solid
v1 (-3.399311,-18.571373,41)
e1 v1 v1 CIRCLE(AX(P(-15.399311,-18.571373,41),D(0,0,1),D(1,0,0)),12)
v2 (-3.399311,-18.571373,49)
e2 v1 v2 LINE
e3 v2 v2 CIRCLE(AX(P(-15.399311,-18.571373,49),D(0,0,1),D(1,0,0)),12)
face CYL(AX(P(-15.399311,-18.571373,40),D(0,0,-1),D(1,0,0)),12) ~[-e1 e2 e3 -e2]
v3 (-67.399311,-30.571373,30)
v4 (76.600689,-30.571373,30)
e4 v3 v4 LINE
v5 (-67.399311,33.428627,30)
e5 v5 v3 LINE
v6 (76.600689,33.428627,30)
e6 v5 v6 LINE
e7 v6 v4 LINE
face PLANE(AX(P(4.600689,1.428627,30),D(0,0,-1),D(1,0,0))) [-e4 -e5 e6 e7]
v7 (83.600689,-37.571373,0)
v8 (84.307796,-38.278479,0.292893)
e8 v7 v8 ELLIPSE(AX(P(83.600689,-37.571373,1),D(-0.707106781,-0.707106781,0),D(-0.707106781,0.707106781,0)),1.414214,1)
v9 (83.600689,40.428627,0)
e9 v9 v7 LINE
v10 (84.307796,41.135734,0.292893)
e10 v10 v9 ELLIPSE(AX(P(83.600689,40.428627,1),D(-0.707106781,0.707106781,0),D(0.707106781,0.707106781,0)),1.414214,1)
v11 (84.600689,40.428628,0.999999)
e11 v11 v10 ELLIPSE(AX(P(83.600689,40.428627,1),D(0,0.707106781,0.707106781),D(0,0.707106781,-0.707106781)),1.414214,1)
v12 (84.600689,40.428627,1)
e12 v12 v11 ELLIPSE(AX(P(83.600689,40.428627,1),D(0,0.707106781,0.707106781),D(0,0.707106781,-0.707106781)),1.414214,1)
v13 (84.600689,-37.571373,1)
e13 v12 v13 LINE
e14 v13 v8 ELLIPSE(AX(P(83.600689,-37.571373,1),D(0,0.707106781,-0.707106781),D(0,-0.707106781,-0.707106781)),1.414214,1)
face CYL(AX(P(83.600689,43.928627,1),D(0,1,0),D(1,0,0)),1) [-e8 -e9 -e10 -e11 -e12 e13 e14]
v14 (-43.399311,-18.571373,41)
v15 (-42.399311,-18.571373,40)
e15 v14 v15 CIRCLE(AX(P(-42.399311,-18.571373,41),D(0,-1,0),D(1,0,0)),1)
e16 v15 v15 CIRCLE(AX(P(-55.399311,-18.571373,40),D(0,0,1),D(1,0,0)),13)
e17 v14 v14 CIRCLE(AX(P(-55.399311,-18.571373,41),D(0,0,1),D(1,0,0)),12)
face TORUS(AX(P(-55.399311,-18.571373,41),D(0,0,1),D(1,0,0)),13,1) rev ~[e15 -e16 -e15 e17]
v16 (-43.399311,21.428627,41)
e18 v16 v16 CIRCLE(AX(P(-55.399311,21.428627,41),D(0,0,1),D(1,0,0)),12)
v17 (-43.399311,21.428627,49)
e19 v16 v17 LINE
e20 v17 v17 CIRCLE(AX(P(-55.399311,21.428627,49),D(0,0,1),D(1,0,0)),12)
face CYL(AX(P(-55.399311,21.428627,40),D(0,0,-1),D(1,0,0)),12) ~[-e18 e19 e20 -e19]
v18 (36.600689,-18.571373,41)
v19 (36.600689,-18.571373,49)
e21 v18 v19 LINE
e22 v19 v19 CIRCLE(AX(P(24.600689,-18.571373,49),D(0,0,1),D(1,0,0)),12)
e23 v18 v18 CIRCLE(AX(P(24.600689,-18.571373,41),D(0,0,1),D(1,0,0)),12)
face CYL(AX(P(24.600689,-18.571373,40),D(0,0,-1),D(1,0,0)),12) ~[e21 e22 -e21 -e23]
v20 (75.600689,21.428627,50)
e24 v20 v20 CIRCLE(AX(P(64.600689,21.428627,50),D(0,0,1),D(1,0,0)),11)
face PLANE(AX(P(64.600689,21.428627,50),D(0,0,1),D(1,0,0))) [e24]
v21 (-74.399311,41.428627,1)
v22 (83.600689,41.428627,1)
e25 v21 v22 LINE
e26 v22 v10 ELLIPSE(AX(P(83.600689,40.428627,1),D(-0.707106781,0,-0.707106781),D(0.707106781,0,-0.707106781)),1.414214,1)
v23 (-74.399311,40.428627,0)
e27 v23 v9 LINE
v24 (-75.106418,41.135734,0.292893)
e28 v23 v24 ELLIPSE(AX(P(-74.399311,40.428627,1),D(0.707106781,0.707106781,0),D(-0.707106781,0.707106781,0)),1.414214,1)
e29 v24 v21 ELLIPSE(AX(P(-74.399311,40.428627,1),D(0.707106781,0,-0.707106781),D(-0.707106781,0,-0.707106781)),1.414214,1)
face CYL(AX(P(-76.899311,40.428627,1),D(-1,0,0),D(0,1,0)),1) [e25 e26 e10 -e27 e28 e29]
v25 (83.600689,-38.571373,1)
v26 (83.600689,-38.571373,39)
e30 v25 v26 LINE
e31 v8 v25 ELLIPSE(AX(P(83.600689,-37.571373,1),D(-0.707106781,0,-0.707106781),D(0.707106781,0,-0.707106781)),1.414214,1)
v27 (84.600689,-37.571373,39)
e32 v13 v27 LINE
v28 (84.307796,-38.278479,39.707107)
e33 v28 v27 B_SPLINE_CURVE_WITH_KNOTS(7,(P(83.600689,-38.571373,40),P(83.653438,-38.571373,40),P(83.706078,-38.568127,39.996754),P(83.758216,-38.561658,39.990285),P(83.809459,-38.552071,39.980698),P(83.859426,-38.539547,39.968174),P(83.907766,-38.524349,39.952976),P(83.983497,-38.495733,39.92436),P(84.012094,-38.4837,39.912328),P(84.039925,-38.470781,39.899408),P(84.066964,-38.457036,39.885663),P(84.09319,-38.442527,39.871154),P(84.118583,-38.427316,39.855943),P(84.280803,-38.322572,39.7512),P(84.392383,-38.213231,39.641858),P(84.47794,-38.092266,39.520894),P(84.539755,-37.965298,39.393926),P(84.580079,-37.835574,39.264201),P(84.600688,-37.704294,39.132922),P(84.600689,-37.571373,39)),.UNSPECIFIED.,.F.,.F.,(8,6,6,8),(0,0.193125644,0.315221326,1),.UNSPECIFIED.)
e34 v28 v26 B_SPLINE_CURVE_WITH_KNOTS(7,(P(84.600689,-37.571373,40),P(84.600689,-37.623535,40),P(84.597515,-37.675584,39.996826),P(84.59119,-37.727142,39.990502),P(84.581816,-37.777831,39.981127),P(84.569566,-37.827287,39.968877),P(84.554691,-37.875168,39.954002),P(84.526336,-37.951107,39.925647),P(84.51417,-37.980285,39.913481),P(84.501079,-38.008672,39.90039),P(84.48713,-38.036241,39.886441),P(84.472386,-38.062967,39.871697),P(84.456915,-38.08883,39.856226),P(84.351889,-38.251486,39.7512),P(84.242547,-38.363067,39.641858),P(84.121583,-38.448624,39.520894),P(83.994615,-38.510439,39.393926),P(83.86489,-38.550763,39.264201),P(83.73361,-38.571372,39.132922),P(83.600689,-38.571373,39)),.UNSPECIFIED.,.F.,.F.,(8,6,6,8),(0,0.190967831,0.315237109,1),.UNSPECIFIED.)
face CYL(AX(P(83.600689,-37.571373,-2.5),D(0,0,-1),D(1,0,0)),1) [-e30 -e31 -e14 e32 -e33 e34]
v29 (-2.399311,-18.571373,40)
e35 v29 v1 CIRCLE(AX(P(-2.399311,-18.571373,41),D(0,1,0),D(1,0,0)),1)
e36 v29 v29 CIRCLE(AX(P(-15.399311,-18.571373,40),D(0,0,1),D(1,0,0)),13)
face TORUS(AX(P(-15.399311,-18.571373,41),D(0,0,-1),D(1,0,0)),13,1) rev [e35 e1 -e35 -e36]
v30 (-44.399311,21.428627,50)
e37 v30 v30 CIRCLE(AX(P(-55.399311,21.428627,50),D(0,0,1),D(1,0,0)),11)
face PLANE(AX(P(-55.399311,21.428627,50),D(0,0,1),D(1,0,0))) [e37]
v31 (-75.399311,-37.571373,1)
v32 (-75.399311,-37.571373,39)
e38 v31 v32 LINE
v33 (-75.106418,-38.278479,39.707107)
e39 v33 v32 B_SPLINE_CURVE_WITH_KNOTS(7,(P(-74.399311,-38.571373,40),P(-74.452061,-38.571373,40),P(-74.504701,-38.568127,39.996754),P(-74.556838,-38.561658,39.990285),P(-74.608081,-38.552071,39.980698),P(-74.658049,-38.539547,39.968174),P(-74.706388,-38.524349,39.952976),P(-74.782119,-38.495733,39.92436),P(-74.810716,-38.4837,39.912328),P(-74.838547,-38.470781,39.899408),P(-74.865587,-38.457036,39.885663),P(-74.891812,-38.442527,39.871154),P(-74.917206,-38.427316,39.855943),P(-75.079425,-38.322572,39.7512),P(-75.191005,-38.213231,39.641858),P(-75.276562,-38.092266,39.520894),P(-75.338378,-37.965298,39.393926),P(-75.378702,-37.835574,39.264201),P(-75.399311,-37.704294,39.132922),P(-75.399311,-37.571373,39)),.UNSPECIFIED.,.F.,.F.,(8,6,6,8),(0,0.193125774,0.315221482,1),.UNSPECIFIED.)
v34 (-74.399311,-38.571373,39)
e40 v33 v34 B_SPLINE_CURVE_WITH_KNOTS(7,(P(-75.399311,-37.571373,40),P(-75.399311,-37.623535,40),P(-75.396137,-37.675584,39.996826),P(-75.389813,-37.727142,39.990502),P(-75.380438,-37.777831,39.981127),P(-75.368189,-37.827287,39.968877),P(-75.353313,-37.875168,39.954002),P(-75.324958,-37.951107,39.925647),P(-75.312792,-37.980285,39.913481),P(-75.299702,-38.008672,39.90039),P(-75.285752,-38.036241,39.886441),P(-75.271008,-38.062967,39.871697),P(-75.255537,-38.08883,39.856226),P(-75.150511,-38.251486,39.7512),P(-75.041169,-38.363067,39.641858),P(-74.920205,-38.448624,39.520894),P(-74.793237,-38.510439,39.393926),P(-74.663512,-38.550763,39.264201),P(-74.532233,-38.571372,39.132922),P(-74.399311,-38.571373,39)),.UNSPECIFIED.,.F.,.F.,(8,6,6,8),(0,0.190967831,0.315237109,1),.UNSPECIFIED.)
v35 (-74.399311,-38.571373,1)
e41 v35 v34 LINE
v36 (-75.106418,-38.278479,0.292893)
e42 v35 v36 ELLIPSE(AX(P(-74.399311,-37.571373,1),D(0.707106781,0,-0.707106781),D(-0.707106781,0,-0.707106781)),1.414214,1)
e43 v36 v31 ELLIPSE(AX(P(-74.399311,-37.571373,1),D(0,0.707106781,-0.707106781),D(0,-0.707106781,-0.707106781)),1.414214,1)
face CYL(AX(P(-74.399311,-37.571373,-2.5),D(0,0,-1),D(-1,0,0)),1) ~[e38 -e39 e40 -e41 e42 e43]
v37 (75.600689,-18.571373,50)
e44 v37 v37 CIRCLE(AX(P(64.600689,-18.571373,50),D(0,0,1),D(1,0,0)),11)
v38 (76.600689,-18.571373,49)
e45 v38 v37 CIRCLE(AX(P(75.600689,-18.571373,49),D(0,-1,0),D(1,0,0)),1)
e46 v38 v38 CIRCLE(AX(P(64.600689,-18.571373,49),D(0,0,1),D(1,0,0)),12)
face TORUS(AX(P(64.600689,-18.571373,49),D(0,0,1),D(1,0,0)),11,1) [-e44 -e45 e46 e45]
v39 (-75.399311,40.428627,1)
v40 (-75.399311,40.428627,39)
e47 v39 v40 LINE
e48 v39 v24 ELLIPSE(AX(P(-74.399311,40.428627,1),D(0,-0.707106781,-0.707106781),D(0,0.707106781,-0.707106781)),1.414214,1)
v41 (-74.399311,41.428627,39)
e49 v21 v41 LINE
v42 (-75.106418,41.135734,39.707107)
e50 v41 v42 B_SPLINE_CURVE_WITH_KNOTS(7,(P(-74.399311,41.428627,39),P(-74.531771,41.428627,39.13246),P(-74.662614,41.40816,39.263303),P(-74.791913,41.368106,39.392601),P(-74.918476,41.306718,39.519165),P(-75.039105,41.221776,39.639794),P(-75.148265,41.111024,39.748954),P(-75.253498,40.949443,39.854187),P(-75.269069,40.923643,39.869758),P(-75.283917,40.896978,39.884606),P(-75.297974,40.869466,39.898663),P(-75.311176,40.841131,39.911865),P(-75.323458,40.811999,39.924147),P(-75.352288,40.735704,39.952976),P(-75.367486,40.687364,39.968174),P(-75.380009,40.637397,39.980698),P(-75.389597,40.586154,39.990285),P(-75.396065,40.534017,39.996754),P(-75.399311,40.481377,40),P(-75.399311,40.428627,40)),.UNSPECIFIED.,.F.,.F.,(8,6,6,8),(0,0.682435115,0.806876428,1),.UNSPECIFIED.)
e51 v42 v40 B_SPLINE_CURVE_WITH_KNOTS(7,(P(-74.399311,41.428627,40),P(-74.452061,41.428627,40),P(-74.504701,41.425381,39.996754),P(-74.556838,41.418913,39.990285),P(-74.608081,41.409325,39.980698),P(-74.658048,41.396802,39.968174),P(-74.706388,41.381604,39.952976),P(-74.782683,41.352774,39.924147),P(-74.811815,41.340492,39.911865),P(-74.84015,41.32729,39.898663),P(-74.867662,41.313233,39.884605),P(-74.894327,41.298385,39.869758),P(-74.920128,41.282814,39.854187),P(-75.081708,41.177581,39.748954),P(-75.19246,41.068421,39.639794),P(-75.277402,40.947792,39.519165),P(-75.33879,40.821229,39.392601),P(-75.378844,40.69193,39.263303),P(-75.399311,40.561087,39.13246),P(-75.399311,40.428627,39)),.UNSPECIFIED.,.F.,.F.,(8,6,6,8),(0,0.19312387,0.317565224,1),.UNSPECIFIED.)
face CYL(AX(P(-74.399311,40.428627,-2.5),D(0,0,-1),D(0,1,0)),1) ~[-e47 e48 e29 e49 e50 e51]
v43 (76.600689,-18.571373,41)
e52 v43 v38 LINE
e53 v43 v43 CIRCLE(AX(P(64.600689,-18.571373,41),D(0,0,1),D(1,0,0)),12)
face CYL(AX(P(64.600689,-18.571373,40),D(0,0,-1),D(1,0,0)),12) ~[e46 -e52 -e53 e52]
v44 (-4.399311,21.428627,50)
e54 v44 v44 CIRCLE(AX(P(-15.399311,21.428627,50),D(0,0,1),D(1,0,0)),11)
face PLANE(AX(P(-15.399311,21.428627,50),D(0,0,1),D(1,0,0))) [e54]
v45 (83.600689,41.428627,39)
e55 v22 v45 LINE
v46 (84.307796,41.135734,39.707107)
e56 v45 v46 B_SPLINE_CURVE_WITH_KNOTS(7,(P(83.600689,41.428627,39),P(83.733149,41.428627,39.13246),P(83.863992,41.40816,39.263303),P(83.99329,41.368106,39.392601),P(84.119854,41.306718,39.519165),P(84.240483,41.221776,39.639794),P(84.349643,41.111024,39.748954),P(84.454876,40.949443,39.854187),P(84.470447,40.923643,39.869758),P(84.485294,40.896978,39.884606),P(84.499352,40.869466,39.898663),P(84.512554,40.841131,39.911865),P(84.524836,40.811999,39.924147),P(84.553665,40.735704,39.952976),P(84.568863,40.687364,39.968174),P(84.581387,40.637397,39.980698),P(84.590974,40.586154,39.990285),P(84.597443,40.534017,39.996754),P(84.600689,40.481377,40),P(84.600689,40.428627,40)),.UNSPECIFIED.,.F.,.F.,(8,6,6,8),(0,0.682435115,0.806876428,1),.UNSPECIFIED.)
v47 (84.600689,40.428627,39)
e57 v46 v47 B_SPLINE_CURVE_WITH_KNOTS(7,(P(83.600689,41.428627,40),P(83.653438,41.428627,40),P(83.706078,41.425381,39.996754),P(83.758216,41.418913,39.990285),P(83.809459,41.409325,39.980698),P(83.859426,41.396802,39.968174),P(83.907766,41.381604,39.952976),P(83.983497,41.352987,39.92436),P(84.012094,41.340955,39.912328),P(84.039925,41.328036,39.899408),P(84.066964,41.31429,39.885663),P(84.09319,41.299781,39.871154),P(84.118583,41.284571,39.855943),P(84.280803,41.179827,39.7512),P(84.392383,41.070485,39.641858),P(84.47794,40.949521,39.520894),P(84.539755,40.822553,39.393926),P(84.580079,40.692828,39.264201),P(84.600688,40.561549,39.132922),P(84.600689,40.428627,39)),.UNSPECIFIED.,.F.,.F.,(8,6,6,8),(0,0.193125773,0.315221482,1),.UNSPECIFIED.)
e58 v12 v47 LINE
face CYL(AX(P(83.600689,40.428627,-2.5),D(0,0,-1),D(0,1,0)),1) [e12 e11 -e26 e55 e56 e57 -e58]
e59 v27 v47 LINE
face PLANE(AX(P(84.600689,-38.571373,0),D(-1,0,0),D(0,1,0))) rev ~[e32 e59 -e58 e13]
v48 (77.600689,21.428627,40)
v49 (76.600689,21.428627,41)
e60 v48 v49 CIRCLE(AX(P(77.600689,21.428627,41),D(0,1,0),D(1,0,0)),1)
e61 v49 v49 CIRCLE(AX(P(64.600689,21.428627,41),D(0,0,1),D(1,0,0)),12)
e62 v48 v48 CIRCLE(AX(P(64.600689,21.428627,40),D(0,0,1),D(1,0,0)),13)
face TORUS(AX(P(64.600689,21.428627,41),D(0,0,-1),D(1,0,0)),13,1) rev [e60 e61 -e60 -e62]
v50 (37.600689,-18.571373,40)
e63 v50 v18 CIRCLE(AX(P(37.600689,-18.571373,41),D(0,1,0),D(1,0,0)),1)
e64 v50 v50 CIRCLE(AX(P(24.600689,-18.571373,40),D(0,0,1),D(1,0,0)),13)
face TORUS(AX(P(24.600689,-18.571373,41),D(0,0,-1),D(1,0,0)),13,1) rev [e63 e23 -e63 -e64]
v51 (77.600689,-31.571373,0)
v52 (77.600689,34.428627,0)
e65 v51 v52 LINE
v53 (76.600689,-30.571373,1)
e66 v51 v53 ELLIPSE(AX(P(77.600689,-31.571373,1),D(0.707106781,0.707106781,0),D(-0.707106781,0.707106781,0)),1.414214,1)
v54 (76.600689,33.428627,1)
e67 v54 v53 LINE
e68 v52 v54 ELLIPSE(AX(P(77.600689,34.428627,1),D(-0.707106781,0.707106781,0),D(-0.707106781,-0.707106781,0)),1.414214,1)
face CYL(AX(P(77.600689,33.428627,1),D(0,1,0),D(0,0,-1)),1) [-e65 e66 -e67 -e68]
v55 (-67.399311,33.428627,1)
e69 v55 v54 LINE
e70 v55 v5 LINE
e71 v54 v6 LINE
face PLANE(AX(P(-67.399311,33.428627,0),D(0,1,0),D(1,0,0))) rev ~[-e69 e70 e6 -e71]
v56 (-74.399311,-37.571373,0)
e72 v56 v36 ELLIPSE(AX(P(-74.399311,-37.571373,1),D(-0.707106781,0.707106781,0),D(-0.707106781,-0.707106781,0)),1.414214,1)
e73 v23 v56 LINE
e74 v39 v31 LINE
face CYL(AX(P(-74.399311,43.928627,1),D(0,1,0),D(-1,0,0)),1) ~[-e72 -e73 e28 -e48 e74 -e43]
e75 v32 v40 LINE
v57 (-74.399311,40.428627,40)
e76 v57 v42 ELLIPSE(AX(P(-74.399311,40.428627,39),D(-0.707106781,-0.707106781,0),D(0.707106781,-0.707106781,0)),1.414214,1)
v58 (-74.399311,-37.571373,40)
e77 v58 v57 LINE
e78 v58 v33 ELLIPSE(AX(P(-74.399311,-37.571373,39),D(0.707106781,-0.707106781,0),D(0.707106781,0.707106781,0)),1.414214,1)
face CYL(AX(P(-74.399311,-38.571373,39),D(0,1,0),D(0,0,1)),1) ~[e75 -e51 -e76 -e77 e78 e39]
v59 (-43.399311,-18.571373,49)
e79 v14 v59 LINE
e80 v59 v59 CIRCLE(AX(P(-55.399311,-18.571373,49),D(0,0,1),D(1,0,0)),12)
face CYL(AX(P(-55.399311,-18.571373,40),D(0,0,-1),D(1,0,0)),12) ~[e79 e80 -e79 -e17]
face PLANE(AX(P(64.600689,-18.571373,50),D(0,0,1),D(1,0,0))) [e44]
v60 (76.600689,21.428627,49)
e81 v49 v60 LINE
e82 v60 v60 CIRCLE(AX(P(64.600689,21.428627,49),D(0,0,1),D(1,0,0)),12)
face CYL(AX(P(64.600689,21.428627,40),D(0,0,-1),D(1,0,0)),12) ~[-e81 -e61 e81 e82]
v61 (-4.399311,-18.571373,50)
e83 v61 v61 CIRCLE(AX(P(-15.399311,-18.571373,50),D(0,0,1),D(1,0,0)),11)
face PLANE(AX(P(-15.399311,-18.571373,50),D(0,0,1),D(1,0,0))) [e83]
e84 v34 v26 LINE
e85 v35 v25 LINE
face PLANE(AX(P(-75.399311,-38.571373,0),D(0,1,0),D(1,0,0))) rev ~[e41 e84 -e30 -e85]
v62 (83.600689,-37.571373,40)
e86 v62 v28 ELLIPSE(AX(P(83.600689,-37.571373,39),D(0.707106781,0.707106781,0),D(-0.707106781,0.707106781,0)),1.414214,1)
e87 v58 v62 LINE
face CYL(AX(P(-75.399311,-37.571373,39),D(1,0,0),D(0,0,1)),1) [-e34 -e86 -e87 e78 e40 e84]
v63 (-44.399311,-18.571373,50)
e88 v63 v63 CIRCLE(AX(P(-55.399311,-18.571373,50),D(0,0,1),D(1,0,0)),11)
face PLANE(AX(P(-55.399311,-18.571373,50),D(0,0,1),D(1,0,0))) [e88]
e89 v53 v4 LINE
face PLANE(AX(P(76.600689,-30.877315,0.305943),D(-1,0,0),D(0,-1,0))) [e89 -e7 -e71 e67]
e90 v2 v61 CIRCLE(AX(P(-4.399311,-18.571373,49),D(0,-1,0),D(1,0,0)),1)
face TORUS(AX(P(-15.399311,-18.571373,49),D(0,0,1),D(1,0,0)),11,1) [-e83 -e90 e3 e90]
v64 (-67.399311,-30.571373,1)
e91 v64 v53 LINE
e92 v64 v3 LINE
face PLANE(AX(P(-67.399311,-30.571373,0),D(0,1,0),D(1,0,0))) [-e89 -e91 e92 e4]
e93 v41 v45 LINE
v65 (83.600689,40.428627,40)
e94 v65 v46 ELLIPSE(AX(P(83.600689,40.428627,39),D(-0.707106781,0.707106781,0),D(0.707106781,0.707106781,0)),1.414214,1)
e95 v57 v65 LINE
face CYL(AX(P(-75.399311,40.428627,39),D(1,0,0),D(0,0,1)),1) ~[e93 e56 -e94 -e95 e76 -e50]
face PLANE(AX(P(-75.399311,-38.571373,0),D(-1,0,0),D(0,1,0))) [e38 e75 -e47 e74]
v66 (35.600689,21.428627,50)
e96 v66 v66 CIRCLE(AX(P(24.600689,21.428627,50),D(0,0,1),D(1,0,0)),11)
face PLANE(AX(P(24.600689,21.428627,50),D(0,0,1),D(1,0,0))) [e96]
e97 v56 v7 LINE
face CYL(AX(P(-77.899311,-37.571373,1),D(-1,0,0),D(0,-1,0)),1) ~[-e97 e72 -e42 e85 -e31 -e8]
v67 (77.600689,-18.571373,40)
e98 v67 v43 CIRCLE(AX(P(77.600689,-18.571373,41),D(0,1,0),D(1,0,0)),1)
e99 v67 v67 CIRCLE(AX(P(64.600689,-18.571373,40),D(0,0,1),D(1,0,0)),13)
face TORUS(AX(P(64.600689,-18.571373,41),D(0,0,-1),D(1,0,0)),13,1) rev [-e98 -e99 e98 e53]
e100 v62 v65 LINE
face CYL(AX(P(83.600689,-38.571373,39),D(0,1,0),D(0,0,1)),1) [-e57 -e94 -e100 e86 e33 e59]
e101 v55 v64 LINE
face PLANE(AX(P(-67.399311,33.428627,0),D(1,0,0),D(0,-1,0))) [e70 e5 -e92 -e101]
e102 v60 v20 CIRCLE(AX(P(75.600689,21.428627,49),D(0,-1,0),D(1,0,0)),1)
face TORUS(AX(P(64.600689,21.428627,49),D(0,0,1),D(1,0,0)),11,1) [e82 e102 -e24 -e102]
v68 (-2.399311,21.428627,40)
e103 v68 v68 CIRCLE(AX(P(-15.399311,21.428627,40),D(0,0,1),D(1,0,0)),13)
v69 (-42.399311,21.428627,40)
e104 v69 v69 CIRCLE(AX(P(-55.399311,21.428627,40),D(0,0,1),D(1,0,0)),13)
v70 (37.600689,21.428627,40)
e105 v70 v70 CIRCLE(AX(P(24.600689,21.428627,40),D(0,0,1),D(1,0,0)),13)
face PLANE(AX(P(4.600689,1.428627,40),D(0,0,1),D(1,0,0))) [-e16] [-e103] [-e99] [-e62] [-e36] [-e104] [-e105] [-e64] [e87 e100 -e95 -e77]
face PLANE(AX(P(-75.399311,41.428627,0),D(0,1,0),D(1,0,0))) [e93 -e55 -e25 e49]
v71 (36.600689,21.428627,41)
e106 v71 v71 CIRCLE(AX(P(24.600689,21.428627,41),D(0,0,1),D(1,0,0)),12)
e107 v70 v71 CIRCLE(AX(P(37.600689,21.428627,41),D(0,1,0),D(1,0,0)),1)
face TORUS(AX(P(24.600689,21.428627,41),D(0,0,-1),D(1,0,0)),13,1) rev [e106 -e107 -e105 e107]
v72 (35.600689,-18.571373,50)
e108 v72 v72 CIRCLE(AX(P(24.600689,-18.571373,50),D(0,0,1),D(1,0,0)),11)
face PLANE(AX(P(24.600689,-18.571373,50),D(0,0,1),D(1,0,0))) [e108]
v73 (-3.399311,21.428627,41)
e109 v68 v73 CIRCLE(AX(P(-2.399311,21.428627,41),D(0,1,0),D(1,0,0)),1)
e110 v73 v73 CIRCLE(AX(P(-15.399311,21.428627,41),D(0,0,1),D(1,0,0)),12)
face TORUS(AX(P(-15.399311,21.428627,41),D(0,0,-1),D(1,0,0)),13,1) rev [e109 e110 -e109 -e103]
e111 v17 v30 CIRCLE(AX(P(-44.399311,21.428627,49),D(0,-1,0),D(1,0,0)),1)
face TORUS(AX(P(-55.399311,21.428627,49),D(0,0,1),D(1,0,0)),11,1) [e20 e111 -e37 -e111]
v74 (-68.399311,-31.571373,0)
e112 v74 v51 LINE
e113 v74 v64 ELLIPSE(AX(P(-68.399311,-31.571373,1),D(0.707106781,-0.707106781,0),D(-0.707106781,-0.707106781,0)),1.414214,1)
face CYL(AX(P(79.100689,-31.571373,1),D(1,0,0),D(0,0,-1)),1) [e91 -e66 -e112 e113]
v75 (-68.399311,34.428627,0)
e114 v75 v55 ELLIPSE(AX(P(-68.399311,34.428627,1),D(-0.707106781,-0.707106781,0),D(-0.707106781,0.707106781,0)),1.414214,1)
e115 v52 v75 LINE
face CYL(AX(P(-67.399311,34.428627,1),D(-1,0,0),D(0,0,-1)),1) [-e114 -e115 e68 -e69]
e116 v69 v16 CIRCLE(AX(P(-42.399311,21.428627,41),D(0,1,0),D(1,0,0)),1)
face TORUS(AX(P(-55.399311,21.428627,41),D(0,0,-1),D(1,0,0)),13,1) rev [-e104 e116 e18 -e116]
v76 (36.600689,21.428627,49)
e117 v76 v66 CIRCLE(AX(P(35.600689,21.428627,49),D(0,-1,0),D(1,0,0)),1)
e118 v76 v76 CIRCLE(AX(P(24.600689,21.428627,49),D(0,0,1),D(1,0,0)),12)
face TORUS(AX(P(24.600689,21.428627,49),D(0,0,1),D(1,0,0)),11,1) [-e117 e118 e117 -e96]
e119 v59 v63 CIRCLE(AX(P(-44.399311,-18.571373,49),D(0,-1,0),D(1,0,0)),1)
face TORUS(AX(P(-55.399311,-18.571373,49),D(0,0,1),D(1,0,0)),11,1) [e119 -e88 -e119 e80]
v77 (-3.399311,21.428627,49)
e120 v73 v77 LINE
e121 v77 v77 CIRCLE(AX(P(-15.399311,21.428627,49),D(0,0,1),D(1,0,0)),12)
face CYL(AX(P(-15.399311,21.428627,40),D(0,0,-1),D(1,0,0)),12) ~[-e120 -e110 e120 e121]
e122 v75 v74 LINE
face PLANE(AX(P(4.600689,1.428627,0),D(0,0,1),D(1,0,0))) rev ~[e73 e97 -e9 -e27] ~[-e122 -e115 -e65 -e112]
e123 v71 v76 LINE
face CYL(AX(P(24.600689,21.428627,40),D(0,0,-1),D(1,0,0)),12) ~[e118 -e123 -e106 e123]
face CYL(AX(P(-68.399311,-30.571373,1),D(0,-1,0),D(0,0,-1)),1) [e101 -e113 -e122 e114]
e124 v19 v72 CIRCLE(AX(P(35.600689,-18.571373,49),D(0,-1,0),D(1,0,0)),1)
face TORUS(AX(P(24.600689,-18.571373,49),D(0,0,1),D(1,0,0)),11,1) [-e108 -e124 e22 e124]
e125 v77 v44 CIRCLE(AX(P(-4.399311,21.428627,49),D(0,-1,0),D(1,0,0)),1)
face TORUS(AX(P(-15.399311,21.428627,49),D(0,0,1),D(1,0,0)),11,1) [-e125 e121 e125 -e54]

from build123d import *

# Parameters (mm, degrees)
F0_W          = 160
F0_H          = 80
F1_DEPTH      = 40
F2_W          = 144
F2_H          = 64
F3_DEPTH      = 30
F4_R          = 12
F5_DEPTH      = 10
F6_R          = 1
F7_R          = 1
F8_T1_DEPTH   = 44
F8_T3_DEPTH   = 165
F9_T1_DEPTH   = 44
F9_T3_DEPTH   = 84
F10_T1_DEPTH  = 84
F10_T3_DEPTH  = 44
F11_T1_DEPTH  = 163
F11_T3_DEPTH  = 144
F11_T5_DEPTH  = 64
F11_T11_DEPTH = 146.5
F11_T15_DEPTH = 66.5
F11_T22_DEPTH = 146.5
F11_T26_DEPTH = 66.5
F11_T33_DEPTH = 66.5
F11_T37_DEPTH = 146.5
F11_T44_DEPTH = 66.5
F11_T48_DEPTH = 146.5


# Not quite as in the source:
# - a fillet or chamfer that OpenCascade refuses, or shapes differently, is made with other operations: its cross-section is extruded or revolved along the edge and cut away or added


with BuildPart() as f1:
    # F0 (on Top) → F1 (new body)
    with BuildSketch(Plane.XY):
        with Locations((4.6006888151, 1.4286273053)):
            Rectangle(F0_W, F0_H)
    extrude(amount=F1_DEPTH)

    # F2 (on face) → F3 (cut)
    with BuildSketch(Plane(origin=(0, 0, 0), x_dir=(1, 0, 0), z_dir=(0, 0, -1))):
        with Locations((4.6006888151, -1.4286273053)):
            Rectangle(F2_W, F2_H)
    extrude(amount=-F3_DEPTH, mode=Mode.SUBTRACT)

    # F4 (on face) → F5 (join)
    with BuildSketch(Plane.XY.offset(40)):
        with Locations((-55.3993111849, 21.4286273053)):
            Circle(F4_R)
        with Locations((-15.3993111849, 21.4286273053)):
            Circle(F4_R)
        with Locations((24.6006888151, 21.4286273053)):
            Circle(F4_R)
        with Locations((64.6006888151, 21.4286273053)):
            Circle(F4_R)
        with Locations((-55.3993111849, -18.5713726947)):
            Circle(F4_R)
        with Locations((-15.3993111849, -18.5713726947)):
            Circle(F4_R)
        with Locations((24.6006888151, -18.5713726947)):
            Circle(F4_R)
        with Locations((64.6006888151, -18.5713726947)):
            Circle(F4_R)
    extrude(amount=F5_DEPTH)

    # F6
    f6_edges = [f1.edges().sort_by_distance(p)[0] for p in [
        (-67.399311, 21.428627, 50),
        (-27.399311, 21.428627, 50),
        (-67.399311, -18.571373, 50),
        (-27.399311, -18.571373, 50),
        (12.600689, 21.428627, 50),
        (52.600689, 21.428627, 50),
        (52.600689, -18.571373, 50),
        (12.600689, -18.571373, 50),
    ]]
    fillet(f6_edges, radius=F6_R)

    # F7
    f7_edges = [f1.edges().sort_by_distance(p)[0] for p in [
        (4.600689, 41.428627, 40),
        (84.600689, 1.428627, 40),
        (-75.399311, 1.428627, 40),
        (4.600689, -38.571373, 40),
        (-67.399311, -18.571373, 40),
        (-27.399311, -18.571373, 40),
        (12.600689, -18.571373, 40),
        (52.600689, -18.571373, 40),
        (-67.399311, 21.428627, 40),
        (-27.399311, 21.428627, 40),
        (12.600689, 21.428627, 40),
        (52.600689, 21.428627, 40),
    ]]
    fillet(f7_edges, radius=F7_R)

    # F8: fillet of radius 1 on 4 edges, made by hand

    # F8_s2 → F8_t1 (cut)
    with BuildSketch(Plane.XY.offset(-2.5)):
        with BuildLine():
            ThreePointArc((-75.3993111849, -37.5713726947), (-75.1064179661, -38.2784794759), (-74.3993111849, -38.5713726947))
            Line((-74.3993111849, -38.5713726947), (-75.3993111849, -38.5713726947))
            Line((-75.3993111849, -38.5713726947), (-75.3993111849, -37.5713726947))
        make_face()
        with BuildLine():
            ThreePointArc((84.6006888151, -37.5713726947), (84.3077955963, -38.2784794759), (83.6006888151, -38.5713726947))
            Line((83.6006888151, -38.5713726947), (84.6006888151, -38.5713726947))
            Line((84.6006888151, -38.5713726947), (84.6006888151, -37.5713726947))
        make_face()
    extrude(amount=F8_T1_DEPTH, mode=Mode.SUBTRACT)

    # F8_s4 → F8_t3 (cut)
    with BuildSketch(Plane.YZ.offset(-77.8993111849)):
        with BuildLine():
            ThreePointArc((-38.5713726947, 1), (-38.2784794759, 0.2928932188), (-37.5713726947, 0))
            Line((-37.5713726947, 0), (-38.5713726947, 0))
            Line((-38.5713726947, 0), (-38.5713726947, 1))
        make_face()
    extrude(amount=F8_T3_DEPTH, mode=Mode.SUBTRACT)

    # F9: fillet of radius 1 on 4 edges, made by hand

    # F9_s2 → F9_t1 (cut)
    with BuildSketch(Plane.XY.offset(-2.5)):
        with BuildLine():
            ThreePointArc((-74.3993111849, 41.4286273053), (-75.1064179661, 41.1357340865), (-75.3993111849, 40.4286273053))
            Line((-75.3993111849, 40.4286273053), (-75.3993111849, 41.4286273053))
            Line((-75.3993111849, 41.4286273053), (-74.3993111849, 41.4286273053))
        make_face()
    extrude(amount=F9_T1_DEPTH, mode=Mode.SUBTRACT)

    # F9_s4 → F9_t3 (cut)
    with BuildSketch(Plane.XZ.offset(-43.9286273053)):
        with BuildLine():
            ThreePointArc((-75.3993111849, 1), (-75.1064179661, 0.2928932188), (-74.3993111849, 0))
            Line((-74.3993111849, 0), (-75.3993111849, 0))
            Line((-75.3993111849, 0), (-75.3993111849, 1))
        make_face()
    extrude(amount=F9_T3_DEPTH, mode=Mode.SUBTRACT)

    # F10: fillet of radius 1 on 4 edges, made by hand

    # F10_s2 → F10_t1 (cut)
    with BuildSketch(Plane.XZ.offset(-43.9286273053)):
        with BuildLine():
            ThreePointArc((84.6006888151, 1), (84.3077955963, 0.2928932188), (83.6006888151, 0))
            Line((83.6006888151, 0), (84.6006888151, 0))
            Line((84.6006888151, 0), (84.6006888151, 1))
        make_face()
    extrude(amount=F10_T1_DEPTH, mode=Mode.SUBTRACT)

    # F10_s4 → F10_t3 (cut)
    with BuildSketch(Plane.XY.offset(-2.5)):
        with BuildLine():
            ThreePointArc((83.6006888151, 41.4286273053), (84.3077955963, 41.1357340865), (84.6006888151, 40.4286273053))
            Line((84.6006888151, 40.4286273053), (84.6006888151, 41.4286273053))
            Line((84.6006888151, 41.4286273053), (83.6006888151, 41.4286273053))
        make_face()
    extrude(amount=F10_T3_DEPTH, mode=Mode.SUBTRACT)

    # F11: fillet of radius 1 on 8 edges, made by hand

    # F11_s2 → F11_t1 (cut)
    with BuildSketch(Plane.YZ.offset(-76.8993111849)):
        with BuildLine():
            ThreePointArc((41.4286273053, 1), (41.1357340865, 0.2928932188), (40.4286273053, 0))
            Line((40.4286273053, 0), (41.4286273053, 0))
            Line((41.4286273053, 0), (41.4286273053, 1))
        make_face()
    extrude(amount=F11_T1_DEPTH, mode=Mode.SUBTRACT)

    # F11_s4 → F11_t3 (cut)
    with BuildSketch(Plane.YZ.offset(-67.3993111849)):
        with BuildLine():
            ThreePointArc((34.4286273053, 0), (33.7215205241, 0.2928932188), (33.4286273053, 1))
            Line((33.4286273053, 1), (33.4286273053, 0))
            Line((33.4286273053, 0), (34.4286273053, 0))
        make_face()
        with BuildLine():
            ThreePointArc((-31.5713726947, 0), (-30.8642659135, 0.2928932188), (-30.5713726947, 1))
            Line((-30.5713726947, 1), (-30.5713726947, 0))
            Line((-30.5713726947, 0), (-31.5713726947, 0))
        make_face()
    extrude(amount=F11_T3_DEPTH, mode=Mode.SUBTRACT)

    # F11_s6 → F11_t5 (cut)
    with BuildSketch(Plane.XZ.offset(-33.4286273053)):
        with BuildLine():
            ThreePointArc((-68.3993111849, 0), (-67.6922044037, 0.2928932188), (-67.3993111849, 1))
            Line((-67.3993111849, 1), (-67.3993111849, 0))
            Line((-67.3993111849, 0), (-68.3993111849, 0))
        make_face()
        with BuildLine():
            ThreePointArc((77.6006888151, 0), (76.8935820339, 0.2928932188), (76.6006888151, 1))
            Line((76.6006888151, 1), (76.6006888151, 0))
            Line((76.6006888151, 0), (77.6006888151, 0))
        make_face()
    extrude(amount=F11_T5_DEPTH, mode=Mode.SUBTRACT)


with BuildPart() as f11_tool9:
    # F11_s10 → F11_t11 (new body)
    with BuildSketch(Plane.YZ.offset(-69.8993111849)):
        with BuildLine():
            ThreePointArc((34.4286273053, 0), (33.7215205241, 0.2928932188), (33.4286273053, 1))
            Line((33.4286273053, 1), (33.4286273053, 0))
            Line((33.4286273053, 0), (34.4286273053, 0))
        make_face()
    extrude(amount=F11_T11_DEPTH)

    split(bisect_by=Plane.YZ.offset(-67.3993111849), keep=Keep.BOTTOM)


with BuildPart() as f11_tool13:
    # F11_s14 → F11_t15 (new body)
    with BuildSketch(Plane.XZ.offset(30.5713726947)):
        with BuildLine():
            ThreePointArc((-68.3993111849, 0), (-67.6922044037, 0.2928932188), (-67.3993111849, 1))
            Line((-67.3993111849, 1), (-67.3993111849, 0))
            Line((-67.3993111849, 0), (-68.3993111849, 0))
        make_face()
    extrude(amount=-F11_T15_DEPTH)

    split(bisect_by=Plane.XZ.offset(-33.4286273053), keep=Keep.BOTTOM)


with BuildPart() as f11_tool9_1:
    add(f11_tool9.part)

    # F11_t17: intersect F11_tool13
    add(f11_tool13.part, mode=Mode.INTERSECT)


with BuildPart() as f1_1:
    add(f1.part)

    # F11_t7: cut F11_tool9
    add(f11_tool9_1.part, mode=Mode.SUBTRACT)


with BuildPart() as f11_tool20:
    # F11_s21 → F11_t22 (new body)
    with BuildSketch(Plane.YZ.offset(-67.3993111849)):
        with BuildLine():
            ThreePointArc((34.4286273053, 0), (33.7215205241, 0.2928932188), (33.4286273053, 1))
            Line((33.4286273053, 1), (33.4286273053, 0))
            Line((33.4286273053, 0), (34.4286273053, 0))
        make_face()
    extrude(amount=F11_T22_DEPTH)

    split(bisect_by=Plane.YZ.offset(76.6006888151), keep=Keep.TOP)


with BuildPart() as f11_tool24:
    # F11_s25 → F11_t26 (new body)
    with BuildSketch(Plane.XZ.offset(-35.9286273053)):
        with BuildLine():
            ThreePointArc((77.6006888151, 0), (76.8935820339, 0.2928932188), (76.6006888151, 1))
            Line((76.6006888151, 1), (76.6006888151, 0))
            Line((76.6006888151, 0), (77.6006888151, 0))
        make_face()
    extrude(amount=F11_T26_DEPTH)

    split(bisect_by=Plane.XZ.offset(-33.4286273053), keep=Keep.BOTTOM)


with BuildPart() as f11_tool20_1:
    add(f11_tool20.part)

    # F11_t28: intersect F11_tool24
    add(f11_tool24.part, mode=Mode.INTERSECT)


with BuildPart() as f1_2:
    add(f1_1.part)

    # F11_t18: cut F11_tool20
    add(f11_tool20_1.part, mode=Mode.SUBTRACT)


with BuildPart() as f11_tool31:
    # F11_s32 → F11_t33 (new body)
    with BuildSketch(Plane.XZ.offset(33.0713726947)):
        with BuildLine():
            ThreePointArc((-68.3993111849, 0), (-67.6922044037, 0.2928932188), (-67.3993111849, 1))
            Line((-67.3993111849, 1), (-67.3993111849, 0))
            Line((-67.3993111849, 0), (-68.3993111849, 0))
        make_face()
    extrude(amount=-F11_T33_DEPTH)

    split(bisect_by=Plane.XZ.offset(30.5713726947), keep=Keep.TOP)


with BuildPart() as f11_tool35:
    # F11_s36 → F11_t37 (new body)
    with BuildSketch(Plane.YZ.offset(76.6006888151)):
        with BuildLine():
            ThreePointArc((-31.5713726947, 0), (-30.8642659135, 0.2928932188), (-30.5713726947, 1))
            Line((-30.5713726947, 1), (-30.5713726947, 0))
            Line((-30.5713726947, 0), (-31.5713726947, 0))
        make_face()
    extrude(amount=-F11_T37_DEPTH)

    split(bisect_by=Plane.YZ.offset(-67.3993111849), keep=Keep.BOTTOM)


with BuildPart() as f11_tool31_1:
    add(f11_tool31.part)

    # F11_t39: intersect F11_tool35
    add(f11_tool35.part, mode=Mode.INTERSECT)


with BuildPart() as f1_3:
    add(f1_2.part)

    # F11_t29: cut F11_tool31
    add(f11_tool31_1.part, mode=Mode.SUBTRACT)


with BuildPart() as f11_tool42:
    # F11_s43 → F11_t44 (new body)
    with BuildSketch(Plane.XZ.offset(-33.4286273053)):
        with BuildLine():
            ThreePointArc((77.6006888151, 0), (76.8935820339, 0.2928932188), (76.6006888151, 1))
            Line((76.6006888151, 1), (76.6006888151, 0))
            Line((76.6006888151, 0), (77.6006888151, 0))
        make_face()
    extrude(amount=F11_T44_DEPTH)

    split(bisect_by=Plane.XZ.offset(30.5713726947), keep=Keep.TOP)


with BuildPart() as f11_tool46:
    # F11_s47 → F11_t48 (new body)
    with BuildSketch(Plane.YZ.offset(79.1006888151)):
        with BuildLine():
            ThreePointArc((-31.5713726947, 0), (-30.8642659135, 0.2928932188), (-30.5713726947, 1))
            Line((-30.5713726947, 1), (-30.5713726947, 0))
            Line((-30.5713726947, 0), (-31.5713726947, 0))
        make_face()
    extrude(amount=-F11_T48_DEPTH)

    split(bisect_by=Plane.YZ.offset(76.6006888151), keep=Keep.TOP)


with BuildPart() as f11_tool42_1:
    add(f11_tool42.part)

    # F11_t50: intersect F11_tool46
    add(f11_tool46.part, mode=Mode.INTERSECT)


with BuildPart() as f1_4:
    add(f1_3.part)

    # F11_t40: cut F11_tool42
    add(f11_tool42_1.part, mode=Mode.SUBTRACT)


solid = f1_4.part
